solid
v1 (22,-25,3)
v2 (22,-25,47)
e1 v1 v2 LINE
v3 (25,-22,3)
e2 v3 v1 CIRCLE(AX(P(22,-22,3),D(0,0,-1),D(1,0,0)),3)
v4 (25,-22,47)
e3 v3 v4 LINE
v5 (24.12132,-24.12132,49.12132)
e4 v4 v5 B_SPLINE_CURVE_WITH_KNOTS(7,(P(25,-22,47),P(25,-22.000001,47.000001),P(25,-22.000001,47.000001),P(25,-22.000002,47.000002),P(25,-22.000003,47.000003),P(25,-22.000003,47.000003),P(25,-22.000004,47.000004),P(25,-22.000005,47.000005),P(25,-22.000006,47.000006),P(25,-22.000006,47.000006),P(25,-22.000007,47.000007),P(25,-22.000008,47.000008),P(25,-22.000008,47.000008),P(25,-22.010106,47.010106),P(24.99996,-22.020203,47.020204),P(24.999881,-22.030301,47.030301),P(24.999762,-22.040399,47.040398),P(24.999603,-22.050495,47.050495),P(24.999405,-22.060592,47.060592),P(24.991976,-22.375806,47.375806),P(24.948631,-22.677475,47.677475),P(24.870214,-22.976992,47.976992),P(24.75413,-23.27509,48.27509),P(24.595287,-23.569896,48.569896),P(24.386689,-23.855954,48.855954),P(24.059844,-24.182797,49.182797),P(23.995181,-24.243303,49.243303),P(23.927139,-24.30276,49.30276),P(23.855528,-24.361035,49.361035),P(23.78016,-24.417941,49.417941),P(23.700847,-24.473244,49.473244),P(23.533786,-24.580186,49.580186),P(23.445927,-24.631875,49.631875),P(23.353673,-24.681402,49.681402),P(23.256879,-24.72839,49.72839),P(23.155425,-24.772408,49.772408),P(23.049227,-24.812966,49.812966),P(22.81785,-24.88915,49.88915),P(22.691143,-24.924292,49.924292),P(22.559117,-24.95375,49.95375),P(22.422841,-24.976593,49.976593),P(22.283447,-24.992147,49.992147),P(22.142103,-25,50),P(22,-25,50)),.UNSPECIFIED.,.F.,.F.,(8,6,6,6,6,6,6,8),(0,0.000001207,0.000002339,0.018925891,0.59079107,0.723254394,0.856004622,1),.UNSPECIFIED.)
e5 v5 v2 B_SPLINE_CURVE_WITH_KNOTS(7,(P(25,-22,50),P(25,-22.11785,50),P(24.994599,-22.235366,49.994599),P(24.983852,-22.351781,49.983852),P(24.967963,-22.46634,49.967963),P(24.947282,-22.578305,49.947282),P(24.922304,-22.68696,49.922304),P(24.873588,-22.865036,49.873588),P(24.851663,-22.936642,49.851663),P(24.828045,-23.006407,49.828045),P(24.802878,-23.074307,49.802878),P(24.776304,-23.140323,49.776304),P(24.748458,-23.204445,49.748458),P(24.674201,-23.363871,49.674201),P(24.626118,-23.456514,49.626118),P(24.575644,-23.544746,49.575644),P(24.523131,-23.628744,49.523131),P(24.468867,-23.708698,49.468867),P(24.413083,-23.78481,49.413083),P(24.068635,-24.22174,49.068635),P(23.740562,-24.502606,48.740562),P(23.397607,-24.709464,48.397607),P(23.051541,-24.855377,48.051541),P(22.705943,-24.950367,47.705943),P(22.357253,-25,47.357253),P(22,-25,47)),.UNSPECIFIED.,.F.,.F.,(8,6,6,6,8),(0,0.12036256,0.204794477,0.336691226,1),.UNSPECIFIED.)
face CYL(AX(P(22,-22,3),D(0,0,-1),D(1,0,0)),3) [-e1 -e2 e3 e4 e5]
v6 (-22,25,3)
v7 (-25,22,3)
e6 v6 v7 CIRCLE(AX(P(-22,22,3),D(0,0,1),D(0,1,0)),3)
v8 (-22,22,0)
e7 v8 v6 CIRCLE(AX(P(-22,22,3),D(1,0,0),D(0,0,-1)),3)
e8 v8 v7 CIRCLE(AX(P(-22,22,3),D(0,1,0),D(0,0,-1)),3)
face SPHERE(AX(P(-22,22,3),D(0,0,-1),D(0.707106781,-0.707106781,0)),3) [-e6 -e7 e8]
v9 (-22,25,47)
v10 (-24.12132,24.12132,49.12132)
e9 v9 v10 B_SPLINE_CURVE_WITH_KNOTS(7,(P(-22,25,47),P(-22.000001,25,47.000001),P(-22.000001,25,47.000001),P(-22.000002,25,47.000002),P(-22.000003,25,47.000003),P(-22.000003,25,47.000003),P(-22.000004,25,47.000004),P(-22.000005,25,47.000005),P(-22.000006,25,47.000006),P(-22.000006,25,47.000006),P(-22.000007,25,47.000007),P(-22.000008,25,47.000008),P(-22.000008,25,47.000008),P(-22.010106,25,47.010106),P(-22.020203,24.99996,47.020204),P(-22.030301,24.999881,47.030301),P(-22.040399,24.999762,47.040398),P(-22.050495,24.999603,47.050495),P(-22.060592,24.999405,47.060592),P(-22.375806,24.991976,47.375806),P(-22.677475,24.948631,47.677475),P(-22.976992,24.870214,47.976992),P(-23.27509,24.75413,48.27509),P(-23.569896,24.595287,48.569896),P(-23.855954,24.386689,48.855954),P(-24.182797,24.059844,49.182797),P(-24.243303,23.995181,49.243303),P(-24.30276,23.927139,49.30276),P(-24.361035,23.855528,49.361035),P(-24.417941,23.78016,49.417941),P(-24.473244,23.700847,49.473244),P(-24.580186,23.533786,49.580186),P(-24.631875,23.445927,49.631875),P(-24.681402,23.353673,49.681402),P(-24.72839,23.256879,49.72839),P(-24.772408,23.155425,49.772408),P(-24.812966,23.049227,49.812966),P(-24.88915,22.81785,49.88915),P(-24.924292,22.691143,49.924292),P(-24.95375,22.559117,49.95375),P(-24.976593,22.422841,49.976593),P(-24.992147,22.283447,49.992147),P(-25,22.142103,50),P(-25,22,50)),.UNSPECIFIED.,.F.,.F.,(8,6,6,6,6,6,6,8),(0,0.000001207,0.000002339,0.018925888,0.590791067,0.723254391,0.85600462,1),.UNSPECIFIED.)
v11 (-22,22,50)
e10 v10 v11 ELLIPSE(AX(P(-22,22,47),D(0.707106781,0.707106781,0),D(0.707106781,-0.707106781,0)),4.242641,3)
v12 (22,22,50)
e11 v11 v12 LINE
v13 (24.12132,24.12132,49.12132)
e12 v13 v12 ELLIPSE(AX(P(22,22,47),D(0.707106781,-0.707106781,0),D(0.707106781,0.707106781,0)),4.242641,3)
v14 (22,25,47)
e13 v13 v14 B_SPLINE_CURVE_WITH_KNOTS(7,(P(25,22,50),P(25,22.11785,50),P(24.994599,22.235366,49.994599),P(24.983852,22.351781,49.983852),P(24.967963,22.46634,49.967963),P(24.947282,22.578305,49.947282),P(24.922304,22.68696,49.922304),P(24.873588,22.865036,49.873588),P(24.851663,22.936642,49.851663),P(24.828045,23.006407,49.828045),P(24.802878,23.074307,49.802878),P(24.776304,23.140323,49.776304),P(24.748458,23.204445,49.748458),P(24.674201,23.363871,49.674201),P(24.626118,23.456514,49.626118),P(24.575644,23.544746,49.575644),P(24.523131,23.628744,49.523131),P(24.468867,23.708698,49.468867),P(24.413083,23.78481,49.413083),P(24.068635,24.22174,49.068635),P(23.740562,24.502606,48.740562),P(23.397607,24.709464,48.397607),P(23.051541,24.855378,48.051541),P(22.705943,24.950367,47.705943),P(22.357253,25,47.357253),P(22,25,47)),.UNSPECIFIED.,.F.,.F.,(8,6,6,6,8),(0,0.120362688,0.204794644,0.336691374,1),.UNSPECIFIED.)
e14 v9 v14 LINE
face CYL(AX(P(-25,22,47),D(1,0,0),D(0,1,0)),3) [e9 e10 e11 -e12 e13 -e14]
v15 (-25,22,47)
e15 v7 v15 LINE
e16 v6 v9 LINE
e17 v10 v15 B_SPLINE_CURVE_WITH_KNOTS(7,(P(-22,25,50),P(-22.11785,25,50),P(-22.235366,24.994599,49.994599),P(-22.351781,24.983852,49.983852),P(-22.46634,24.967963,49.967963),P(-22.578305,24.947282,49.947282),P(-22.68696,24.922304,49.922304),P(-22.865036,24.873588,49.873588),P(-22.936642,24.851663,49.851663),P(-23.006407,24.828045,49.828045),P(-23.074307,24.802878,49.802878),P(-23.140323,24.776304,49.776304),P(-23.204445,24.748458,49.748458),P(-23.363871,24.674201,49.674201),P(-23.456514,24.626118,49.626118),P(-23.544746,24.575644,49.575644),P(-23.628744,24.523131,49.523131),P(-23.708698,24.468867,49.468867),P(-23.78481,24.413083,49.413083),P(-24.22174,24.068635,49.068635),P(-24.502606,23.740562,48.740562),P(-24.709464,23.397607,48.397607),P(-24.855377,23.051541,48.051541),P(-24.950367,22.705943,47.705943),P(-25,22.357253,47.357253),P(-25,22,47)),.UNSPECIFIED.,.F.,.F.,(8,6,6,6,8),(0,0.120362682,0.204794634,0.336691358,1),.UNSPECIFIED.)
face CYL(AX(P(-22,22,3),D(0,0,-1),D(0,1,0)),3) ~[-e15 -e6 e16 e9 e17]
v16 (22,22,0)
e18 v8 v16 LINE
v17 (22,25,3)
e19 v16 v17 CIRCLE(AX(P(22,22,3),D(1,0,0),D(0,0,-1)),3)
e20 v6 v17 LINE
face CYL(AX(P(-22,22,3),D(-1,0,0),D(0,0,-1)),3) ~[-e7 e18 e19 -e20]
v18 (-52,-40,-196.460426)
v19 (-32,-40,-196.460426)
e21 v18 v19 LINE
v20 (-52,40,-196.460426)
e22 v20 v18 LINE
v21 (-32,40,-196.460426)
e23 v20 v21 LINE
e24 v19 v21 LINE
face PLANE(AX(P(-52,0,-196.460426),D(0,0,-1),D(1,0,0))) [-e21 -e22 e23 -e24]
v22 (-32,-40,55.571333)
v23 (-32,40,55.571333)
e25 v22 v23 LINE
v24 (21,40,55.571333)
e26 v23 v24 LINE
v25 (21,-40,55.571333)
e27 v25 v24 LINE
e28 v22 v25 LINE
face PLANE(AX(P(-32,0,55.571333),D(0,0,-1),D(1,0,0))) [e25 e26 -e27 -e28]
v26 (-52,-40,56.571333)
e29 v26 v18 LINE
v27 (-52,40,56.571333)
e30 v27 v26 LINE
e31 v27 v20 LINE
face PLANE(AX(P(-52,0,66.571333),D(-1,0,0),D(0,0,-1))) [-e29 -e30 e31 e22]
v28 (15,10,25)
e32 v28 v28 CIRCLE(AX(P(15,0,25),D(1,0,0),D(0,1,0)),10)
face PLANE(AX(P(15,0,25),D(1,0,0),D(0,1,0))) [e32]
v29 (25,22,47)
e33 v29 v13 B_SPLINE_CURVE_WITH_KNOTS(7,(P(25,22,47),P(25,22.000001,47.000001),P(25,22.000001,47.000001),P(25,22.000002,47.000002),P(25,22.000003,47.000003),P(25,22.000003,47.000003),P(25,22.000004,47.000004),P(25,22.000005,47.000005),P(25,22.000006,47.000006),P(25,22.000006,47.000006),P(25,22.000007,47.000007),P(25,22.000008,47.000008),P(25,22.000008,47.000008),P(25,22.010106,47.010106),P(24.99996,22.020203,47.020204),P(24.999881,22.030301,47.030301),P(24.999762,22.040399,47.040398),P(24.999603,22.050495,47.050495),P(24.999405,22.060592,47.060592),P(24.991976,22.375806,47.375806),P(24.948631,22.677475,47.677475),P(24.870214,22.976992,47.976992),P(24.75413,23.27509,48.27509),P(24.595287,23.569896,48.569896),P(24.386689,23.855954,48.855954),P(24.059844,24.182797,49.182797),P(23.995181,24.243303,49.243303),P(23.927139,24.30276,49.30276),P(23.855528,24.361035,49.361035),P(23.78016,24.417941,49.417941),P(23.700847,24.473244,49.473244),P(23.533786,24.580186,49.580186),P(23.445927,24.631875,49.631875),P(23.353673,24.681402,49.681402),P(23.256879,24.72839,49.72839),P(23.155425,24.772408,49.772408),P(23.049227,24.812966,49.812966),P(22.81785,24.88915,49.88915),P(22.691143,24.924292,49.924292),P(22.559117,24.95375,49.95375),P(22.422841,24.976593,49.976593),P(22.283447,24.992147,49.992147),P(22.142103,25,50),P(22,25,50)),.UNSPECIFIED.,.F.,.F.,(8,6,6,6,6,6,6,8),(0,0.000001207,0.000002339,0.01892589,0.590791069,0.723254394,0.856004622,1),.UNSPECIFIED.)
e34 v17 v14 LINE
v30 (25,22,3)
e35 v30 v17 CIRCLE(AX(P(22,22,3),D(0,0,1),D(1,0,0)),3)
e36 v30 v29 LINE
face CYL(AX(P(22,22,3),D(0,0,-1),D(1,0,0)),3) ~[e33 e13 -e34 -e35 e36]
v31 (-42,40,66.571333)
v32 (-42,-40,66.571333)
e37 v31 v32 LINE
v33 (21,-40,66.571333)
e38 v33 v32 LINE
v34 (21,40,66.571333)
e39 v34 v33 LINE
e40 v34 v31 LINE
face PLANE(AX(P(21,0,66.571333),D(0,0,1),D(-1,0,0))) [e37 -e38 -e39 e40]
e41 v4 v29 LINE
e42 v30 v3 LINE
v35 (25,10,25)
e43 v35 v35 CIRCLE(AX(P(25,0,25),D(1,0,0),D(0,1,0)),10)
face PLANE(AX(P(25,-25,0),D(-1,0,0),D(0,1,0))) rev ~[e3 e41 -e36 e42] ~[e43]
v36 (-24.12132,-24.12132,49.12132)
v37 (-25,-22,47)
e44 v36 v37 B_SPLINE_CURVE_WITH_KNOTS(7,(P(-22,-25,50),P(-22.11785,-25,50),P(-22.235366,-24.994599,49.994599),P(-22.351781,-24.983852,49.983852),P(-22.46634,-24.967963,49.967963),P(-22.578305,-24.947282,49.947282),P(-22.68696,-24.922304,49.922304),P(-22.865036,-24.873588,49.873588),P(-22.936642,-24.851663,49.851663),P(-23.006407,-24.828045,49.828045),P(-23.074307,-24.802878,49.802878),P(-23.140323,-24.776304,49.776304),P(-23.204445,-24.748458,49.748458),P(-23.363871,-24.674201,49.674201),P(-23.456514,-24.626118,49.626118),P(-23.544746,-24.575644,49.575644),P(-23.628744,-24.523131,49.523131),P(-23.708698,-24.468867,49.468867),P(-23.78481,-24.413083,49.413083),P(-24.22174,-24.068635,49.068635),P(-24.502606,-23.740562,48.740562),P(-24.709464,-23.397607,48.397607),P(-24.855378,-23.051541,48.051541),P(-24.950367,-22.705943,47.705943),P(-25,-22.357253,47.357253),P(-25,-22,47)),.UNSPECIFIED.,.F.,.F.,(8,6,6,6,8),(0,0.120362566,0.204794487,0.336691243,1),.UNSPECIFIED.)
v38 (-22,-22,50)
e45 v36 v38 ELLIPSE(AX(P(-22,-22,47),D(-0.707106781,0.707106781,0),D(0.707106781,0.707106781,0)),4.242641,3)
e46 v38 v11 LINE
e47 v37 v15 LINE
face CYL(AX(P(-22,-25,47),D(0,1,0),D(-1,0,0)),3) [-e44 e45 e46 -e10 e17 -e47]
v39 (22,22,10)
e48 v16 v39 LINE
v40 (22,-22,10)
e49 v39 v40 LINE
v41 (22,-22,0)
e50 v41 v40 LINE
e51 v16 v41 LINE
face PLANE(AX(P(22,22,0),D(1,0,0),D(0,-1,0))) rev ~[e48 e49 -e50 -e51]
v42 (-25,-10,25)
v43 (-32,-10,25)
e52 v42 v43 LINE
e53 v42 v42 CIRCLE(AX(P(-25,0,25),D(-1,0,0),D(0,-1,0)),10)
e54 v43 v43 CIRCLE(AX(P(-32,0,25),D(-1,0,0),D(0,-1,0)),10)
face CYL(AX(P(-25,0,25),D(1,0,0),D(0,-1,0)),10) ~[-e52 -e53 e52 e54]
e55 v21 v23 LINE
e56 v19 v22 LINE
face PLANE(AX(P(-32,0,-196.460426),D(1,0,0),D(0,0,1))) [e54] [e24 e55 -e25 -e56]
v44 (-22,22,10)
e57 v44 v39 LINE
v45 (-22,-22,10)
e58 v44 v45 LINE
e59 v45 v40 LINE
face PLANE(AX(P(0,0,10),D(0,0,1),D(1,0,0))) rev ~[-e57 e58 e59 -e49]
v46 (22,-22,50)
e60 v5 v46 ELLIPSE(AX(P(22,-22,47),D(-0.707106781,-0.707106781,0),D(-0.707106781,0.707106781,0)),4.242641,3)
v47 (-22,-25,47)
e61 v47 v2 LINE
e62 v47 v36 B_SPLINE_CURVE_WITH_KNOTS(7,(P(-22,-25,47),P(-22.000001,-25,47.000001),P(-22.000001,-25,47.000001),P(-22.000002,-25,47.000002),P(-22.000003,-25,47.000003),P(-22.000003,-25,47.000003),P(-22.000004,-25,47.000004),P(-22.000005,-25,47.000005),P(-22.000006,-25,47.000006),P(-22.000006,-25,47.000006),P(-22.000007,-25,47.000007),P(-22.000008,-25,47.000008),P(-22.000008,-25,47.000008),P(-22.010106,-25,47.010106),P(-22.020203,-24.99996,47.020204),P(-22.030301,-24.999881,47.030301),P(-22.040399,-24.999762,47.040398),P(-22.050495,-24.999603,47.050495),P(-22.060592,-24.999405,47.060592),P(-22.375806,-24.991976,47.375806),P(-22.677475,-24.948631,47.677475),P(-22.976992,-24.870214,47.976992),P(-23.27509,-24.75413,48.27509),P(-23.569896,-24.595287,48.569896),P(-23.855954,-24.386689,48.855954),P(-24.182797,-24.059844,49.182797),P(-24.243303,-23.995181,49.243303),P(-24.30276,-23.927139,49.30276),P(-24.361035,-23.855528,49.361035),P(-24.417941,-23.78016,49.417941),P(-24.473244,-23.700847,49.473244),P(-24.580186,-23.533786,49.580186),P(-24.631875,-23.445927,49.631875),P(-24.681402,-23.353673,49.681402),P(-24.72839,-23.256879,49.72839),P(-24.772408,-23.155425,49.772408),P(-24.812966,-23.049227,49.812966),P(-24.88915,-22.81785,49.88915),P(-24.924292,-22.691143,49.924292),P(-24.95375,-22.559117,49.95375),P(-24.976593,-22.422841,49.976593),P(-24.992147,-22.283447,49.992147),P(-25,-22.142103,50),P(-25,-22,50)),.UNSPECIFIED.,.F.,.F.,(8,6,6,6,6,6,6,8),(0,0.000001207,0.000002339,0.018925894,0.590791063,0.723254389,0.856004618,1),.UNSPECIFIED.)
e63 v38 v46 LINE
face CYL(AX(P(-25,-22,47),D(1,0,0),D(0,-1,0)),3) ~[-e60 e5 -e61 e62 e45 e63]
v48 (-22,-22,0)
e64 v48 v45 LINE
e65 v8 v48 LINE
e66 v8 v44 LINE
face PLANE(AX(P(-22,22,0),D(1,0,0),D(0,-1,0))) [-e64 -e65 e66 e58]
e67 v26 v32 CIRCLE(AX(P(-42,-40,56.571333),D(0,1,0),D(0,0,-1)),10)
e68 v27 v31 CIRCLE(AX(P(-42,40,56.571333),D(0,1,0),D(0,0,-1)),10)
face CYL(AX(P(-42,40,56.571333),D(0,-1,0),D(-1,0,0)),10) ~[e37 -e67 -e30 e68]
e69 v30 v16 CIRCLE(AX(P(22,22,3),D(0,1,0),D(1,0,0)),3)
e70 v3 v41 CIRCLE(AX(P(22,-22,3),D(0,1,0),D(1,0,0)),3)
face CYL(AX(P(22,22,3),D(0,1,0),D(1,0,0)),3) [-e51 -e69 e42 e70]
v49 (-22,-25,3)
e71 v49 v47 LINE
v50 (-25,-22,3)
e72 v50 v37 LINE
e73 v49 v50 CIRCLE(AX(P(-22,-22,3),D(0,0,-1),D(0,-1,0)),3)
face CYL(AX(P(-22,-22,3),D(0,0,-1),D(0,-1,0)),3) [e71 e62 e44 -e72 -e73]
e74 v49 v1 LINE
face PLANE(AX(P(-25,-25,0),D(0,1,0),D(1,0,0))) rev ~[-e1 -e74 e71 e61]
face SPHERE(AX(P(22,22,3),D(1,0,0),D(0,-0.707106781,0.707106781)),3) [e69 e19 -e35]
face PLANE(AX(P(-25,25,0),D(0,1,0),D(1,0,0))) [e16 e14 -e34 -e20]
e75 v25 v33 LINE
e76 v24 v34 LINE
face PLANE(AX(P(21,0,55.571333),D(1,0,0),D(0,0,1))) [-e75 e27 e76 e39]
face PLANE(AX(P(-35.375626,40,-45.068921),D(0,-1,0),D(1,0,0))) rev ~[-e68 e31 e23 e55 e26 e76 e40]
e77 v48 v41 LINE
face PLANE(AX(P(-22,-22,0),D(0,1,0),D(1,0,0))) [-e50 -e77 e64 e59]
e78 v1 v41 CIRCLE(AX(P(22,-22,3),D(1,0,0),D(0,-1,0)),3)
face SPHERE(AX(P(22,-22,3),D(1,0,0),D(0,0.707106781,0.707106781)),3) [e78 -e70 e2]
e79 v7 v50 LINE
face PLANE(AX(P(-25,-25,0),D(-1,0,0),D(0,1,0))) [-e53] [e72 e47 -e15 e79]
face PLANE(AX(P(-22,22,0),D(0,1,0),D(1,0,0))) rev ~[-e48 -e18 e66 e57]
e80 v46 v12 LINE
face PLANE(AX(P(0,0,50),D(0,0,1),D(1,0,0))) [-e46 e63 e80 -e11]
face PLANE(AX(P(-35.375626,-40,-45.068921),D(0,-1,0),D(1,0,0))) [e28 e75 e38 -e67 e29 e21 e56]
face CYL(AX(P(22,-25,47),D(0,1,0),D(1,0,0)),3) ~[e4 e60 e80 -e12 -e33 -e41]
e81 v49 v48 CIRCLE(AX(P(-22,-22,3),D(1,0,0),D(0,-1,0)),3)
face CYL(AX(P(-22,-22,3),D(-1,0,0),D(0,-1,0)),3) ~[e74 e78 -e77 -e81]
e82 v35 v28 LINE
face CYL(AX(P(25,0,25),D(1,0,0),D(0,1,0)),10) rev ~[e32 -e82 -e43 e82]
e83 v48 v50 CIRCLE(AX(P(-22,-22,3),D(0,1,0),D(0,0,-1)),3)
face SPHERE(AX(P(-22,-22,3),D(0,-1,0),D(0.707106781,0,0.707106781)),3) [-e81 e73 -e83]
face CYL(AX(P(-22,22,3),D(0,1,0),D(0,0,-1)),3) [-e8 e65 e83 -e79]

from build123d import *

# Parameters (mm, degrees)
F0_W           = 50
F0_H           = 50
F1_DEPTH       = 50
F2_R           = 3
F3_T1_DEPTH    = 51.5
F3_T3_DEPTH    = 44
F3_T5_DEPTH    = 44
F3_S9_W        = 3.06
F3_S9_H        = 3.06
F3_T10_DEPTH   = 3.06
F3_S15_W       = 3.06
F3_S15_H       = 3.06
F3_T16_DEPTH   = 3.06
F3_S21_W       = 3.06
F3_S21_H       = 3.06
F3_T22_DEPTH   = 3.06
F3_S27_W       = 3.06
F3_S27_H       = 3.06
F3_T28_DEPTH   = 3.06
F5_DEPTH       = 10
F6_R           = 10
F7_DEPTH       = 10
F4_R           = 10
F8_DEPTH       = 20
F10_DEPTH      = 40
F10_DEPTH_BACK = 40
F11_R          = 10


# Not quite as in the source:
# - a fillet or chamfer that OpenCascade refuses, or shapes differently, is made with other operations: its cross-section is extruded or revolved along the edge and cut away or added


with BuildPart() as f1:
    # F0 (on Top) → F1 (new body)
    with BuildSketch(Plane.XY):
        Rectangle(F0_W, F0_H)
    extrude(amount=F1_DEPTH)

    # F2
    f2_edges = [f1.edges().sort_by_distance(p)[0] for p in [
        (25, 0, 50),
        (0, 25, 50),
        (-25, 0, 50),
        (0, -25, 50),
    ]]
    fillet(f2_edges, radius=F2_R)

    # F3: fillet of radius 3 on 12 edges, made by hand

    # F3_s2 → F3_t1 (cut)
    with BuildSketch(Plane.XY.offset(3)):
        with BuildLine():
            ThreePointArc((-22, -25), (-24.1213203436, -24.1213203436), (-25, -22))
            Line((-25, -22), (-25, -25))
            Line((-25, -25), (-22, -25))
        make_face()
        with BuildLine():
            ThreePointArc((25, -22), (24.1213203436, -24.1213203436), (22, -25))
            Line((22, -25), (25, -25))
            Line((25, -25), (25, -22))
        make_face()
        with BuildLine():
            ThreePointArc((25, 22), (24.1213203436, 24.1213203436), (22, 25))
            Line((22, 25), (25, 25))
            Line((25, 25), (25, 22))
        make_face()
        with BuildLine():
            ThreePointArc((-22, 25), (-24.1213203436, 24.1213203436), (-25, 22))
            Line((-25, 22), (-25, 25))
            Line((-25, 25), (-22, 25))
        make_face()
    extrude(amount=F3_T1_DEPTH, mode=Mode.SUBTRACT)

    # F3_s4 → F3_t3 (cut)
    with BuildSketch(Plane.YZ.offset(-22)):
        with BuildLine():
            ThreePointArc((-25, 3), (-24.1213203436, 0.8786796564), (-22, 0))
            Line((-22, 0), (-25, 0))
            Line((-25, 0), (-25, 3))
        make_face()
        with BuildLine():
            ThreePointArc((22, 0), (24.1213203436, 0.8786796564), (25, 3))
            Line((25, 3), (25, 0))
            Line((25, 0), (22, 0))
        make_face()
    extrude(amount=F3_T3_DEPTH, mode=Mode.SUBTRACT)

    # F3_s6 → F3_t5 (cut)
    with BuildSketch(Plane.XZ.offset(-22)):
        with BuildLine():
            ThreePointArc((25, 3), (24.1213203436, 0.8786796564), (22, 0))
            Line((22, 0), (25, 0))
            Line((25, 0), (25, 3))
        make_face()
        with BuildLine():
            ThreePointArc((-22, 0), (-24.1213203436, 0.8786796564), (-25, 3))
            Line((-25, 3), (-25, 0))
            Line((-25, 0), (-22, 0))
        make_face()
    extrude(amount=F3_T5_DEPTH, mode=Mode.SUBTRACT)


with BuildPart() as f3_tool8:
    # F3_s9 → F3_t10 (new body)
    with BuildSketch(Plane.XZ.offset(22)):
        with Locations((-23.53, 1.47)):
            Rectangle(F3_S9_W, F3_S9_H)
    extrude(amount=F3_T10_DEPTH)

    # F3_s11 → F3_t12 (revolve, cut)
    with BuildSketch(Plane(origin=(-22, -22, 3), x_dir=(0.7071067812, 0, 0.7071067812), z_dir=(0.7071067812, 0, -0.7071067812))):
        with BuildLine():
            ThreePointArc((0, -3), (3, 0), (0, 3))
            Line((0, 3), (0, -3))
        make_face()
    revolve(axis=Axis((-22, -22, 3), (0, -1, 0)), mode=Mode.SUBTRACT)


with BuildPart() as f1_1:
    add(f1.part)

    # F3_t7: cut F3_tool8
    add(f3_tool8.part, mode=Mode.SUBTRACT)


with BuildPart() as f3_tool14:
    # F3_s15 → F3_t16 (new body)
    with BuildSketch(Plane.YZ.offset(22)):
        with Locations((-23.53, 1.47)):
            Rectangle(F3_S15_W, F3_S15_H)
    extrude(amount=F3_T16_DEPTH)

    # F3_s17 → F3_t18 (revolve, cut)
    with BuildSketch(Plane(origin=(22, -22, 3), x_dir=(0, 0.7071067812, 0.7071067812), z_dir=(0, 0.7071067812, -0.7071067812))):
        with BuildLine():
            ThreePointArc((0, -3), (3, 0), (0, 3))
            Line((0, 3), (0, -3))
        make_face()
    revolve(axis=Axis((22, -22, 3), (1, 0, 0)), mode=Mode.SUBTRACT)


with BuildPart() as f1_2:
    add(f1_1.part)

    # F3_t13: cut F3_tool14
    add(f3_tool14.part, mode=Mode.SUBTRACT)


with BuildPart() as f3_tool20:
    # F3_s21 → F3_t22 (new body)
    with BuildSketch(Plane.YZ.offset(22)):
        with Locations((23.53, 1.47)):
            Rectangle(F3_S21_W, F3_S21_H)
    extrude(amount=F3_T22_DEPTH)

    # F3_s23 → F3_t24 (revolve, cut)
    with BuildSketch(Plane(origin=(22, 22, 3), x_dir=(0, -0.7071067812, 0.7071067812), z_dir=(0, 0.7071067812, 0.7071067812))):
        with BuildLine():
            ThreePointArc((0, -3), (3, 0), (0, 3))
            Line((0, 3), (0, -3))
        make_face()
    revolve(axis=Axis((22, 22, 3), (1, 0, 0)), mode=Mode.SUBTRACT)


with BuildPart() as f1_3:
    add(f1_2.part)

    # F3_t19: cut F3_tool20
    add(f3_tool20.part, mode=Mode.SUBTRACT)


with BuildPart() as f3_tool26:
    # F3_s27 → F3_t28 (new body)
    with BuildSketch(Plane.XY.offset(3)):
        with Locations((-23.53, 23.53)):
            Rectangle(F3_S27_W, F3_S27_H)
    extrude(amount=-F3_T28_DEPTH)

    # F3_s29 → F3_t30 (revolve, cut)
    with BuildSketch(Plane(origin=(-22, 22, 3), x_dir=(0.7071067812, -0.7071067812, 0), z_dir=(0.7071067812, 0.7071067812, 0))):
        with BuildLine():
            ThreePointArc((0, -3), (3, 0), (0, 3))
            Line((0, 3), (0, -3))
        make_face()
    revolve(axis=Axis((-22, 22, 3), (0, 0, -1)), mode=Mode.SUBTRACT)


with BuildPart() as f1_4:
    add(f1_3.part)

    # F3_t25: cut F3_tool26
    add(f3_tool26.part, mode=Mode.SUBTRACT)

    # F5 (cut): a face of the model
    f5_faces = [f1_4.faces().sort_by_distance(p)[0] for p in [
        (0, 0, 0),
    ]]
    extrude(f5_faces, amount=-F5_DEPTH, mode=Mode.SUBTRACT)

    # F6 (on face) → F7 (cut)
    with BuildSketch(Plane.YZ.offset(25)):
        with Locations((0, 25)):
            Circle(F6_R)
    extrude(amount=-F7_DEPTH, mode=Mode.SUBTRACT)

    # F4 (on face) → F8 (join)
    with BuildSketch(Plane(origin=(-25, 0, 0), x_dir=(0, -1, 0), z_dir=(-1, 0, 0))):
        with Locations((0, 25)):
            Circle(F4_R)
    extrude(amount=F8_DEPTH)

    # F9 (on Front) → F10 (join, two sides)
    with BuildSketch(Plane.XZ) as f10_sk:
        Polygon((21, 55.5713325143), (21, 66.5713325143), (-52, 66.5713325143), (-52, -196.4604258537), (-32, -196.4604258537), (-32, 55.5713325143), align=None)
    extrude(amount=F10_DEPTH)
    extrude(f10_sk.sketch, amount=-F10_DEPTH_BACK)

    # F11
    f11_edges = [f1_4.edges().sort_by_distance(p)[0] for p in [
        (-52, 0, 66.571333),
    ]]
    fillet(f11_edges, radius=F11_R)


solid = f1_4.part
